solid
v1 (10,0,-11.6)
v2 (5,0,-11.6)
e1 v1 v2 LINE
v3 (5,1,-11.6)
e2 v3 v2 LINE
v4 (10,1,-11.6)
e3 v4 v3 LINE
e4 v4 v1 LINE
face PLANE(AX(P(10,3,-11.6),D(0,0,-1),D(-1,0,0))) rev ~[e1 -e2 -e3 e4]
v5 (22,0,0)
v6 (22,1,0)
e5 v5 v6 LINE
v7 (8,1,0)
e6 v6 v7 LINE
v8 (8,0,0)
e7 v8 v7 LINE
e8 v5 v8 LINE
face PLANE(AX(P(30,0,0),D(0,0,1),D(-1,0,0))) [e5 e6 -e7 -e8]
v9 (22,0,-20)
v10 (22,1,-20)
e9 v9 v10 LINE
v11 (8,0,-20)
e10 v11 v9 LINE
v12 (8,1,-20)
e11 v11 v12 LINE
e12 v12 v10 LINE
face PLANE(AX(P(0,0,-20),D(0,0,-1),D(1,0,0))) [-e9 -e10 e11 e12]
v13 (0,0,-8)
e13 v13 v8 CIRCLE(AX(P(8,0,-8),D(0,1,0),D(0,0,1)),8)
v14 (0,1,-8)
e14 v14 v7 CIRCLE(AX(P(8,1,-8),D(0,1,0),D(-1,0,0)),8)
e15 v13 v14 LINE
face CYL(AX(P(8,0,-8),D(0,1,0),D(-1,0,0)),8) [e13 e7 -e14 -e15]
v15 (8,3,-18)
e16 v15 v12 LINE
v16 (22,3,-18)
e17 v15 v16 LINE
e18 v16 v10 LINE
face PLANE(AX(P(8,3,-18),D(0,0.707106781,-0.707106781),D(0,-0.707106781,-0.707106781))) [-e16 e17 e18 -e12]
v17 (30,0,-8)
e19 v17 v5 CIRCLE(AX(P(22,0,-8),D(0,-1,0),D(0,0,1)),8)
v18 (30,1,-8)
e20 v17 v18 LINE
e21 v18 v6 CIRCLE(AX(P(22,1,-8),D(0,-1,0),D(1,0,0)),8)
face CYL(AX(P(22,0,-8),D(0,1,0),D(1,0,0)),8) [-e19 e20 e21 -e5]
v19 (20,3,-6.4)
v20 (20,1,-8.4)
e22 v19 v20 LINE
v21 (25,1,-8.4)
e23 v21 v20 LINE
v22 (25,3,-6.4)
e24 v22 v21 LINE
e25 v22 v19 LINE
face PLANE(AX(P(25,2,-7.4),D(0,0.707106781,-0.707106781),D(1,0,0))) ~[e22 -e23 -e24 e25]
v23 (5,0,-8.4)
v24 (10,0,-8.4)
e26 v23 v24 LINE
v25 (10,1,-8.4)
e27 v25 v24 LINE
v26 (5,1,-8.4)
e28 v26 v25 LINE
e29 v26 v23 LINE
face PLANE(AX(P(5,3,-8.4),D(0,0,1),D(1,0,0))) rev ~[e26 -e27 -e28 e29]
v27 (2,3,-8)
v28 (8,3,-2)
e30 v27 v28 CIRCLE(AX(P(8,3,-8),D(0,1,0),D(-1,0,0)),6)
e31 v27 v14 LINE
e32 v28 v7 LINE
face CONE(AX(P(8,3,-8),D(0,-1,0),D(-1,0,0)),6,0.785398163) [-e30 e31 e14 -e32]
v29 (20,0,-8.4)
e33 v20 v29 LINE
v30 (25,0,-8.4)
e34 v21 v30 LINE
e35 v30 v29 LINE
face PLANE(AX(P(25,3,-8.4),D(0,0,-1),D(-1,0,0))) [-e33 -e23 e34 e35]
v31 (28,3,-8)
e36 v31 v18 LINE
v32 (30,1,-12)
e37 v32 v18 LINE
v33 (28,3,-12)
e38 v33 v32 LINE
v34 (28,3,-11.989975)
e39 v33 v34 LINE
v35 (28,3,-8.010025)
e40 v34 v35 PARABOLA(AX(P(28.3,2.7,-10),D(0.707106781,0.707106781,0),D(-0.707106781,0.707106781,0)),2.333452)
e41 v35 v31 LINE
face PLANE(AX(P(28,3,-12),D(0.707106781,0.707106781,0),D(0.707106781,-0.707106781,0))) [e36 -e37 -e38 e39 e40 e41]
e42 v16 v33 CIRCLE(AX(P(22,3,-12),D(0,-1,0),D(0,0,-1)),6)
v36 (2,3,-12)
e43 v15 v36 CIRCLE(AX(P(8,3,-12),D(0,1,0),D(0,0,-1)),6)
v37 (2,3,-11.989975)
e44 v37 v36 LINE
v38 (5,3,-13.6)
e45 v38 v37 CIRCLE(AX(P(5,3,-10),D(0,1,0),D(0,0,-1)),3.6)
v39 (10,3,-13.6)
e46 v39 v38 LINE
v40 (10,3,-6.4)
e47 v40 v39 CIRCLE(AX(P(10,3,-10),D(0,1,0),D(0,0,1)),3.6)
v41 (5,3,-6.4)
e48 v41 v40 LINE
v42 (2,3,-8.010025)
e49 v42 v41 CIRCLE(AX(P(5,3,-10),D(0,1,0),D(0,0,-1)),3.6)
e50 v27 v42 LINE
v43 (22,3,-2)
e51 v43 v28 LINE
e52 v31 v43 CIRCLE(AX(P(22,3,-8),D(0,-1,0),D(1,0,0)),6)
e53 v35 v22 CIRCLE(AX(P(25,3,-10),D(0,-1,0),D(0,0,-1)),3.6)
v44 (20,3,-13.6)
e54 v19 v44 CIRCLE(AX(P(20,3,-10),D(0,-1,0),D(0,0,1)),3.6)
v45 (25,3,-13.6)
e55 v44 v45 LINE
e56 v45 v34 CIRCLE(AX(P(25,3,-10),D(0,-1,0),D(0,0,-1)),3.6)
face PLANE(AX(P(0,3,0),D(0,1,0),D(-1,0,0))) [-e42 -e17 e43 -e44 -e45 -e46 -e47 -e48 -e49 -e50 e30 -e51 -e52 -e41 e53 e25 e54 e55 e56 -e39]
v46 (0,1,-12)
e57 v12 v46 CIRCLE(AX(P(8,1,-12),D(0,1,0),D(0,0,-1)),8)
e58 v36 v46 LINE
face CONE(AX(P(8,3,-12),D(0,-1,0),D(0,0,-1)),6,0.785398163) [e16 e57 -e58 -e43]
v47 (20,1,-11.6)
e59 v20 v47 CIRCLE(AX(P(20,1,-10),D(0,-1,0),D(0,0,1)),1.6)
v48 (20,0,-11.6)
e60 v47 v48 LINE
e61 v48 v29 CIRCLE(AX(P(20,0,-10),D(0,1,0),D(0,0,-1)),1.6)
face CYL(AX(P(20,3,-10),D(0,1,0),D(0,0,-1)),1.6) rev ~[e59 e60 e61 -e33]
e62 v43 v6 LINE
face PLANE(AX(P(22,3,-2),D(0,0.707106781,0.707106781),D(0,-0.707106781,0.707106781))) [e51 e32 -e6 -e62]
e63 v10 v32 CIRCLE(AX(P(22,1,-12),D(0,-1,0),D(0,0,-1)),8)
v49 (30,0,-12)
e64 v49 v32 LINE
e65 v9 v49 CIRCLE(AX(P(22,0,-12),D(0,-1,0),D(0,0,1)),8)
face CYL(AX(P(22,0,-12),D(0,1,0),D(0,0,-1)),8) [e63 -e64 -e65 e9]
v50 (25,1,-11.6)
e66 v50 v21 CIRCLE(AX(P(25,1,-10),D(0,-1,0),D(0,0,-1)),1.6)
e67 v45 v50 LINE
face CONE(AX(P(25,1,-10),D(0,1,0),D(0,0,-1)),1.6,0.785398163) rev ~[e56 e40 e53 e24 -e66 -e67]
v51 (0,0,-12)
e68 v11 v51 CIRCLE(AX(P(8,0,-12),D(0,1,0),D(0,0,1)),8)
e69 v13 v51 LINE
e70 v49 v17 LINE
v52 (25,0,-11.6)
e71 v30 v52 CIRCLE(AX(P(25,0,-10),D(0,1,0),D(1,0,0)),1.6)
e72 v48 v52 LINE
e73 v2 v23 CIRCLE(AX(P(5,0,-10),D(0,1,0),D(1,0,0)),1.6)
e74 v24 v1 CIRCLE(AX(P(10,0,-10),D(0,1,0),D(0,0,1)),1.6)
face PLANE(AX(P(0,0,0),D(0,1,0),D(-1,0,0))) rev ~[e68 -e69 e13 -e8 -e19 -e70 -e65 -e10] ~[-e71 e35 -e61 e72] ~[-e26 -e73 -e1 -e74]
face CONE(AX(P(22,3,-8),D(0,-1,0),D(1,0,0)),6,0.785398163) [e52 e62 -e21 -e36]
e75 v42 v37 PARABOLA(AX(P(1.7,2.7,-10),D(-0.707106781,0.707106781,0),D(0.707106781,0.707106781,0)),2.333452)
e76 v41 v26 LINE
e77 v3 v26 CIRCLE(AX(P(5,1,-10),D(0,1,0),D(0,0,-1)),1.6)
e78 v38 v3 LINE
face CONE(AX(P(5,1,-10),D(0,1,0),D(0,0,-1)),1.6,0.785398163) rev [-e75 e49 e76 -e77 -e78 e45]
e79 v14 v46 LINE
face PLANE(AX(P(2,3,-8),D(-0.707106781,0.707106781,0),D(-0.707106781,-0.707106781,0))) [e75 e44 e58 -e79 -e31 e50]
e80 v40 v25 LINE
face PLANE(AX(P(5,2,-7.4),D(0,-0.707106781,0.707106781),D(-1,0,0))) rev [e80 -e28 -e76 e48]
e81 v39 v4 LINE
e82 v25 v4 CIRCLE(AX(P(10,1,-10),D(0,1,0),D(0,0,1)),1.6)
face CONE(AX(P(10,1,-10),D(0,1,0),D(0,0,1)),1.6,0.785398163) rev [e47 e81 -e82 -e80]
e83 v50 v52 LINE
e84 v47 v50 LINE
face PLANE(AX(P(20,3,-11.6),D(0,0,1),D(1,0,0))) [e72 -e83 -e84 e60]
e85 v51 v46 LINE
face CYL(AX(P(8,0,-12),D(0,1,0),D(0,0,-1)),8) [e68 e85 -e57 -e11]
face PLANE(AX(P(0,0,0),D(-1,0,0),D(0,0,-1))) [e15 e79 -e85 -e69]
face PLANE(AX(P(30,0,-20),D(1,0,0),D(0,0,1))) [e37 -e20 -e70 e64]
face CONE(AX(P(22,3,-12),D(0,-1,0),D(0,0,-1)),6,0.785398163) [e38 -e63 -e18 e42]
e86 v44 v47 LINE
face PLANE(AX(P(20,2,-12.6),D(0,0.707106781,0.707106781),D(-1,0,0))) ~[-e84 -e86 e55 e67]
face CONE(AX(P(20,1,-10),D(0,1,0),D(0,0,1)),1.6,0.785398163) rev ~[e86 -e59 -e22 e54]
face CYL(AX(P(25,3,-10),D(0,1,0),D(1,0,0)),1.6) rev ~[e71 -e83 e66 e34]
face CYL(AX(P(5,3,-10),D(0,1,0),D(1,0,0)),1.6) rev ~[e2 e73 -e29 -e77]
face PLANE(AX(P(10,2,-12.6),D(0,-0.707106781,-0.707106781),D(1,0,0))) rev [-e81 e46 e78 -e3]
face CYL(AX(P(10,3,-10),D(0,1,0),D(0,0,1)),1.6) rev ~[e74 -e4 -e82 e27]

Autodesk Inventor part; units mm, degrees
ref_plane "YZ Plane" through (0, 0, 0) normal (1, 0, 0) x (0, 1, 0)
ref_plane "XZ Plane" through (0, 0, 0) normal (0, 1, 0) x (-1, 0, 0)
ref_plane "XY Plane" through (0, 0, 0) normal (0, 0, 1) x (1, 0, 0)
sketch "Sketch1" plane through (0, 0, 0) normal (0, 1, 0) x (-1, 0, 0)
  line L0 (0, -20) -> (-30, -20)
  line L1 (-30, -20) -> (-30, 0)
  line L2 (-30, 0) -> (0, 0)
  line L3 (0, 0) -> (0, -20)
  dimension "d0" = 20
  dimension "d1" = 30
extrude "Extrusion1" add sketch "Sketch1" along normal blind 3
sketch "Sketch10" plane through (0, 3, 0) normal (0, 1, 0) x (1, 0, 0)
  circle A0 centre (5, 10) radius 1.6
  circle A1 centre (25, 10) radius 1.6
  line L0 (30, 20) -> (0, 20) projected
  line L1 (0, 0) -> (30, 0) projected
  line L2 (0, 20) -> (0, 0) projected
  line L3 (30, 0) -> (30, 20) projected
  line L4 (5, 10) -> (10, 10) construction
  line L5 (5, 8.4) -> (10, 8.4)
  line L6 (10, 11.6) -> (5, 11.6)
  arc A2 (5, 11.6) -> (5, 8.4) centre (5, 10) ccw
  arc A3 (10, 8.4) -> (10, 11.6) centre (10, 10) ccw
  line L7 (25, 10) -> (20, 10) construction
  line L8 (25, 8.4) -> (20, 8.4)
  line L9 (20, 11.6) -> (25, 11.6)
  arc A4 (25, 8.4) -> (25, 11.6) centre (25, 10) ccw
  arc A5 (20, 11.6) -> (20, 8.4) centre (20, 10) ccw
  point P0 (7.5, 10)
  point P1 (22.5, 10)
  dimension "d66" = 3.2
  dimension "d64" = 20
  dimension "d65" = 10
  dimension "d67" = 5
  dimension "d68" = 20
  dimension "d69" = 5
  dimension "d79" = 5
  dimension "d80" = 5
extrude "Extrusion6" cut sketch "Sketch10" against normal through all contours A0 | A0 L6 A3 L5 | A1 | A1 L8 A5 L9
fillet "Fillet5" radius 8 4 edges at (0, 1.5, 0) (0, 1.5, -20) (30, 1.5, -20) (30, 1.5, 0)
chamfer "Chamfer5" distance 2 angle 45 2 edges at (3.4, 3, -10) (26.6, 3, -10)
chamfer "Chamfer6" distance 2 angle 45 8 edges at (15, 3, 0) (27.6569, 3, -2.3431) (30, 3, -10) (27.6569, 3, -17.6569) (15, 3, -20) (2.3431, 3, -17.6569) (0, 3, -10) (2.3431, 3, -2.3431)
equation "\"d65\" = 0.5 * d64"
properties part number "synth-straight-bracket"
